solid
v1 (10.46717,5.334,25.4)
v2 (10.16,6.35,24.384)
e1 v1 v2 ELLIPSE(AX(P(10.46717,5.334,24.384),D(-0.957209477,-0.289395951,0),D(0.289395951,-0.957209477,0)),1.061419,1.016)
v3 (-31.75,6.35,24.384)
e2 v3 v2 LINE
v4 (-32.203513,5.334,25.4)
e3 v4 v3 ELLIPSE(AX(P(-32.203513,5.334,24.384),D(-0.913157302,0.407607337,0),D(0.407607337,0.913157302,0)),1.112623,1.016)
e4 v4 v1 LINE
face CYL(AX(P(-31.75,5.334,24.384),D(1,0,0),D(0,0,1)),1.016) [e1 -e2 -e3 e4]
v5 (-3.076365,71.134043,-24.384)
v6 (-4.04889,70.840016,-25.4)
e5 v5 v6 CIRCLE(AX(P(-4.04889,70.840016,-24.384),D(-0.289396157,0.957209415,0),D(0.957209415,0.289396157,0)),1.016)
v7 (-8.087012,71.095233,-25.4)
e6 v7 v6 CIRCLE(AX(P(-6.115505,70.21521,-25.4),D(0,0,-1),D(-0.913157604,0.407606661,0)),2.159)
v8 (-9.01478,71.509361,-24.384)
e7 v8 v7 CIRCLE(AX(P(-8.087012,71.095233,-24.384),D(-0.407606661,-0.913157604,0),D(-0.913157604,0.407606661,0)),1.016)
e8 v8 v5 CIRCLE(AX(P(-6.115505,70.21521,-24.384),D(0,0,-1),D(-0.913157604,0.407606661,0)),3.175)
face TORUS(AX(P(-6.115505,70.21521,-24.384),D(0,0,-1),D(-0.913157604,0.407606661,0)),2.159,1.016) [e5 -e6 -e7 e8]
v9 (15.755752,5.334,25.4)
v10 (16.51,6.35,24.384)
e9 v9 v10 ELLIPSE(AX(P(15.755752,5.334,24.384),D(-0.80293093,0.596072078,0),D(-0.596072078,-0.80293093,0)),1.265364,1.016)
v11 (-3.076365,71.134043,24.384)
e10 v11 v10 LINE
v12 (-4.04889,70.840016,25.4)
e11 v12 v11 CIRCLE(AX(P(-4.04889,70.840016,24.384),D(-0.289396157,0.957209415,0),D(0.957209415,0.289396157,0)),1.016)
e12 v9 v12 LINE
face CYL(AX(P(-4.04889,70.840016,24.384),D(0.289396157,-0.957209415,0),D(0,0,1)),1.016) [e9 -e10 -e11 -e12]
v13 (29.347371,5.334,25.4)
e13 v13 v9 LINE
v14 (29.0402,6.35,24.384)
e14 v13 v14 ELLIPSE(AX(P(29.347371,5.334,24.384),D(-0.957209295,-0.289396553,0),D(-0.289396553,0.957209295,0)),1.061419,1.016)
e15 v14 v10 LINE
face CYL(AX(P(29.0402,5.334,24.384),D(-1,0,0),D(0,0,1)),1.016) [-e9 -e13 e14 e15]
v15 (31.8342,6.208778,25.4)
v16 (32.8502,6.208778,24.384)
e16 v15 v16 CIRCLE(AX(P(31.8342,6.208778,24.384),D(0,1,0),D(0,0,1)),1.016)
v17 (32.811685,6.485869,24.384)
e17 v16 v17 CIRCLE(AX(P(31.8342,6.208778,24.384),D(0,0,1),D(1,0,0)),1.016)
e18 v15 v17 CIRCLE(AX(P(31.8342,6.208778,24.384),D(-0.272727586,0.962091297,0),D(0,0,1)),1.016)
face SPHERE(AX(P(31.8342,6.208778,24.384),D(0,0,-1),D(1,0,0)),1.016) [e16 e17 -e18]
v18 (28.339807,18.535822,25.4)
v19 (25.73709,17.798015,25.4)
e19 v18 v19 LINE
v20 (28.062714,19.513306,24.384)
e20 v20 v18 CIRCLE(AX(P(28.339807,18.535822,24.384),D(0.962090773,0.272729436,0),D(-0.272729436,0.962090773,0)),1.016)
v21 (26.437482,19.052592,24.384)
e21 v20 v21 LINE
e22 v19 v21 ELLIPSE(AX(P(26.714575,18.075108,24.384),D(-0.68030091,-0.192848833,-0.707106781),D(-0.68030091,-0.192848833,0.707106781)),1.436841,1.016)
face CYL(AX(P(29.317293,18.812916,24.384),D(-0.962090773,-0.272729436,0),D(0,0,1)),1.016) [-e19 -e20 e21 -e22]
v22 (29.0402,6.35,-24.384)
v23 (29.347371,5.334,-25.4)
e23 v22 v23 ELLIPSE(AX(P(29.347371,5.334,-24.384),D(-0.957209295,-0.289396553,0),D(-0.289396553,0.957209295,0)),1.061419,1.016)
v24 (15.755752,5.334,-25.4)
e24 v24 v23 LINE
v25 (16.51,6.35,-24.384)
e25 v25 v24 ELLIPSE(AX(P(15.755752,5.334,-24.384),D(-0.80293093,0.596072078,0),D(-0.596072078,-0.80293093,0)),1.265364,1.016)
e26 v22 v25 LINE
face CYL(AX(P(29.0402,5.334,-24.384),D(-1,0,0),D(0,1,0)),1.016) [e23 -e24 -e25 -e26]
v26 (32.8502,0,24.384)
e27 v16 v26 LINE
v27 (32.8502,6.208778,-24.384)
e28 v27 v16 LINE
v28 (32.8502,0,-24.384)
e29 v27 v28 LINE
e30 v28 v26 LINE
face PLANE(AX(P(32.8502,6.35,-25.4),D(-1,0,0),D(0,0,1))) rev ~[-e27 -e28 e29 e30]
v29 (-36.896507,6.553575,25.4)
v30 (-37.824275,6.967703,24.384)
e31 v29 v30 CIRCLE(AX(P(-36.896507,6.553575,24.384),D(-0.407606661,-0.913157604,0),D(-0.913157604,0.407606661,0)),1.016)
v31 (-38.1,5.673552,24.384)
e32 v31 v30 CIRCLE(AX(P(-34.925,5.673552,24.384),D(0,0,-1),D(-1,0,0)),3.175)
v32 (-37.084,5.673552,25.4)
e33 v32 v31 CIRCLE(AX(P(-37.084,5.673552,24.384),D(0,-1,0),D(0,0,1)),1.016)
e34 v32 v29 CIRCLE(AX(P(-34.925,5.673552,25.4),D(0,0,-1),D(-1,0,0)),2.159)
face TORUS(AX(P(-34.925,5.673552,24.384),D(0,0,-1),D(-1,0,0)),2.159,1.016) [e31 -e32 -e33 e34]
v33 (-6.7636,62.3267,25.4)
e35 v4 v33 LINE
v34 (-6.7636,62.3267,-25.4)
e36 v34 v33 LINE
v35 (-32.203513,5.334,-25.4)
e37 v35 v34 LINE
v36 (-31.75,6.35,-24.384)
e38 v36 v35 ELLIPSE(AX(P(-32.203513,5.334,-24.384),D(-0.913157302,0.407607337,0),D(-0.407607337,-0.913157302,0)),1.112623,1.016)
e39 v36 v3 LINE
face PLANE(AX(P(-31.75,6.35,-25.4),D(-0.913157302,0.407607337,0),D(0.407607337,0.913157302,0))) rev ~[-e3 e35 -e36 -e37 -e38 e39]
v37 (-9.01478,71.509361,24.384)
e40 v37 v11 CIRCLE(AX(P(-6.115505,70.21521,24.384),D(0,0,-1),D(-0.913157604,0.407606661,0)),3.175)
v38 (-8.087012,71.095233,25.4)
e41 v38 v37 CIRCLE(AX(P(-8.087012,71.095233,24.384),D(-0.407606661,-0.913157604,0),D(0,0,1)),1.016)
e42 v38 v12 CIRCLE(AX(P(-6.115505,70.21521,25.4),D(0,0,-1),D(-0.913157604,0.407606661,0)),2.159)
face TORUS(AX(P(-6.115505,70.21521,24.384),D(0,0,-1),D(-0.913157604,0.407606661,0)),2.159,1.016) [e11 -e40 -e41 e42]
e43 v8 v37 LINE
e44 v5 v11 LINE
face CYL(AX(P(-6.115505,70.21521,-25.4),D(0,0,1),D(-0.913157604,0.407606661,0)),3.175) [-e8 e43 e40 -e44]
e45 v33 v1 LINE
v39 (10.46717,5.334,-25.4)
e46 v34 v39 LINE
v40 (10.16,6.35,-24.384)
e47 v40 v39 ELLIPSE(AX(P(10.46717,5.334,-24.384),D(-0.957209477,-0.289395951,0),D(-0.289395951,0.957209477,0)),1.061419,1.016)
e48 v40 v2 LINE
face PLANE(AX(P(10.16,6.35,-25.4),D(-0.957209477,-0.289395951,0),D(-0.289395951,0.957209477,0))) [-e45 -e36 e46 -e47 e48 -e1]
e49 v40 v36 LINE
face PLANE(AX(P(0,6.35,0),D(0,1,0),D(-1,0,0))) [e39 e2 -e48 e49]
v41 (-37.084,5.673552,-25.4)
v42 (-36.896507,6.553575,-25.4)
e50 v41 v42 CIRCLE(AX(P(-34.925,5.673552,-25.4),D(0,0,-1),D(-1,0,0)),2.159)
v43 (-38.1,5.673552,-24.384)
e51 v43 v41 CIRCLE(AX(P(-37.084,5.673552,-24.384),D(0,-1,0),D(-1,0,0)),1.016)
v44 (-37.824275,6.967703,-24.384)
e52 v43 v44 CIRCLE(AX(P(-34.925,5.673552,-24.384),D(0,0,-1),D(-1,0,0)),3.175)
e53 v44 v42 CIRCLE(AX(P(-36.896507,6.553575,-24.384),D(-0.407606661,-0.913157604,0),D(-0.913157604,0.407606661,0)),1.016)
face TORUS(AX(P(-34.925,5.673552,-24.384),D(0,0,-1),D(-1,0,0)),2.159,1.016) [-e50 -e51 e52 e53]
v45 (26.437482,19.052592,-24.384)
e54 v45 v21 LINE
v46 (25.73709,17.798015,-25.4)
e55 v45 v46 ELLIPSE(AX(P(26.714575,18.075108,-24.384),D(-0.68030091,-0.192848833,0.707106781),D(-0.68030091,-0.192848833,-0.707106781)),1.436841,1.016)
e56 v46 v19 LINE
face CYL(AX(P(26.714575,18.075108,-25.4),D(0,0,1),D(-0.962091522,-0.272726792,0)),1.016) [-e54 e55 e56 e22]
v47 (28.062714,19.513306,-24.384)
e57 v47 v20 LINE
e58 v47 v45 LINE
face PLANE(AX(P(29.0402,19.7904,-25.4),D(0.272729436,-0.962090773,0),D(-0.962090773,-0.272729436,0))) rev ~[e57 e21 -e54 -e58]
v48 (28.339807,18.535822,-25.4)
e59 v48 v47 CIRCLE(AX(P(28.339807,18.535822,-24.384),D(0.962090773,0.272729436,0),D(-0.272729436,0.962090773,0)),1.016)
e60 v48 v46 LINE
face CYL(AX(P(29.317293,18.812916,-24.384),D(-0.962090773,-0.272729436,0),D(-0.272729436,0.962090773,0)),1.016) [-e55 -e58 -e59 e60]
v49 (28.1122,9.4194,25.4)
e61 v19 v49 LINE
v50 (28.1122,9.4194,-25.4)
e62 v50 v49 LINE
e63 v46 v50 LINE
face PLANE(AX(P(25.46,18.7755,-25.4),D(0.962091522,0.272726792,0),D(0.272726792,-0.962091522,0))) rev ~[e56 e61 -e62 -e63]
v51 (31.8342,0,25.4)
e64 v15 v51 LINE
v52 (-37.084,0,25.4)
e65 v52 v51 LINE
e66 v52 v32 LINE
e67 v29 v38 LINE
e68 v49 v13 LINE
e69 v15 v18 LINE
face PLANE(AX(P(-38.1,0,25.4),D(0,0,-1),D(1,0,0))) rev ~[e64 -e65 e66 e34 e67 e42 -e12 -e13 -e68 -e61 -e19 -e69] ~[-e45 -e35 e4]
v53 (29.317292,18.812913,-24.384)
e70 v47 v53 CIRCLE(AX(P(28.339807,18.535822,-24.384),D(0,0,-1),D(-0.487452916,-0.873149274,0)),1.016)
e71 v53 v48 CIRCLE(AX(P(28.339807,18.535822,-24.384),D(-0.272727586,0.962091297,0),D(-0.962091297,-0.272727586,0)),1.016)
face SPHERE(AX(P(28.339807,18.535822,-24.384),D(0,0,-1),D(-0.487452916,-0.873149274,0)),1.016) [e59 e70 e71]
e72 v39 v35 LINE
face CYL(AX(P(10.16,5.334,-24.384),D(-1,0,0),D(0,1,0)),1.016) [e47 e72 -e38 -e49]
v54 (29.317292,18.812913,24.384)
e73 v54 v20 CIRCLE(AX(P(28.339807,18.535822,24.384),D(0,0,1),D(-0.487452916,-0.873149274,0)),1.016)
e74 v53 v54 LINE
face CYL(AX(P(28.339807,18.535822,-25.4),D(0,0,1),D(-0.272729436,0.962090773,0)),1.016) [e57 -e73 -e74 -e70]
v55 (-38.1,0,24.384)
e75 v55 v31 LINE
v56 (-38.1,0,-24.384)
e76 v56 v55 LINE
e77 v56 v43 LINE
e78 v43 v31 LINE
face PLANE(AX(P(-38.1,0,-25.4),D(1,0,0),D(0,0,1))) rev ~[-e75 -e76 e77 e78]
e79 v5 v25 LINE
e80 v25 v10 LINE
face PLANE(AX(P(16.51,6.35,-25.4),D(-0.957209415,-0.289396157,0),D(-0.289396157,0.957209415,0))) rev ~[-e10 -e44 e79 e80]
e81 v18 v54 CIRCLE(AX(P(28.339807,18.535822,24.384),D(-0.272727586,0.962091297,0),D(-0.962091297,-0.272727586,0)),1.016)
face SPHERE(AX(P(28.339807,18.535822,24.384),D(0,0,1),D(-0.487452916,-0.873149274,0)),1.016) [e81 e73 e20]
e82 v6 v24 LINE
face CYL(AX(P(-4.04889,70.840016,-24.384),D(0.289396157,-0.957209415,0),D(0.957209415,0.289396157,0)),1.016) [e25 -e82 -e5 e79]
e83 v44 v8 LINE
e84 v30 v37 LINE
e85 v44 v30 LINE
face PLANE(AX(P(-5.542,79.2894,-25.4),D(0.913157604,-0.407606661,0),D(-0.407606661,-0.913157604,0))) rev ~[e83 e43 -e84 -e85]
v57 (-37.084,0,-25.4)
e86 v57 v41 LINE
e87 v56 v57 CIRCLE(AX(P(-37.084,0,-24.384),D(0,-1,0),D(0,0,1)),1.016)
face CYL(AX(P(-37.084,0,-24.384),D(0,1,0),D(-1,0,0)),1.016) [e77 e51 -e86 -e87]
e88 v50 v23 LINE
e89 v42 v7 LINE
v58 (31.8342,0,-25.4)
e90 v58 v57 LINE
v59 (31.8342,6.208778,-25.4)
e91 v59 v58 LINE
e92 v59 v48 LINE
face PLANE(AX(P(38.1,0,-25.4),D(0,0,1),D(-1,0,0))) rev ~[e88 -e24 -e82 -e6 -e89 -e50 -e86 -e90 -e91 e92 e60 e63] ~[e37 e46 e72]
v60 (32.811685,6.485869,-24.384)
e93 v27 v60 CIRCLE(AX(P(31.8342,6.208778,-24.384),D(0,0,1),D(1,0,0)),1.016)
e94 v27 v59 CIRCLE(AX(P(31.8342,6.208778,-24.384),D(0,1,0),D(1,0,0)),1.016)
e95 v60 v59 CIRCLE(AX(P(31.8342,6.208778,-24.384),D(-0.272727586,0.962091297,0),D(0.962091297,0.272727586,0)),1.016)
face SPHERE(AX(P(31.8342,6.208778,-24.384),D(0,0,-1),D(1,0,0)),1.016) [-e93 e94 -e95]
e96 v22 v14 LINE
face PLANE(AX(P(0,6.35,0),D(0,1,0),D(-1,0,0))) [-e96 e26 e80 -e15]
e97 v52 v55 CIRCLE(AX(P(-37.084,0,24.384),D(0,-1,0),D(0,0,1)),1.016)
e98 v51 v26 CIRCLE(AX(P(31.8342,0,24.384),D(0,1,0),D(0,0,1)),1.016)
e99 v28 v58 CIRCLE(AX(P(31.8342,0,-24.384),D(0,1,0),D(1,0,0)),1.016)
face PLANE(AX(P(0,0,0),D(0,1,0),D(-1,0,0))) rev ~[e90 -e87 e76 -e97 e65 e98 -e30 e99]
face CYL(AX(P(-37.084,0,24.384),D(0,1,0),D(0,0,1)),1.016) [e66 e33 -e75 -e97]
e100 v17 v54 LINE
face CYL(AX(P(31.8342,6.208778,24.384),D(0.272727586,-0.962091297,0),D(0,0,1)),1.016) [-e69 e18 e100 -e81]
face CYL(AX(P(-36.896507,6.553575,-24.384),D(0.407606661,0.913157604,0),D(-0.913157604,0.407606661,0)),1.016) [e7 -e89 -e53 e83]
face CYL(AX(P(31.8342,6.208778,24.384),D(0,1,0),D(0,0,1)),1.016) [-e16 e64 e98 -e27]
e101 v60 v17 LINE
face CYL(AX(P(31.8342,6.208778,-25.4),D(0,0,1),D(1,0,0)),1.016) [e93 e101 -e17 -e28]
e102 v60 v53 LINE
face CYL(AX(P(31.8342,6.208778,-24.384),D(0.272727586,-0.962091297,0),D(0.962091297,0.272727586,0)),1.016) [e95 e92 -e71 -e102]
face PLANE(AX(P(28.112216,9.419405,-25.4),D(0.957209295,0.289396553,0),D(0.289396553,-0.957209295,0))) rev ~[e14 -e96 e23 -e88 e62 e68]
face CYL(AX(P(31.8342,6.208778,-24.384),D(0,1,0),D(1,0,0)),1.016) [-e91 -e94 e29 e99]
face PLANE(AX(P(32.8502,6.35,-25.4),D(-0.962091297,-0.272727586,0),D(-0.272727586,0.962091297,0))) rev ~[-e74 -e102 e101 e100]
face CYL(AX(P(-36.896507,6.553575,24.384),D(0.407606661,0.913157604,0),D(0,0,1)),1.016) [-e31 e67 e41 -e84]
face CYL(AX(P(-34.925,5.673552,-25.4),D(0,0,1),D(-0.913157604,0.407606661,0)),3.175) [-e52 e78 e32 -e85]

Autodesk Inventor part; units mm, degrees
ref_plane "YZ Plane" through (0, 0, 0) normal (1, 0, 0) x (0, 1, 0)
ref_plane "XZ Plane" through (0, 0, 0) normal (0, 1, 0) x (-1, 0, 0)
ref_plane "XY Plane" through (0, 0, 0) normal (0, 0, 1) x (1, 0, 0)
sketch "Sketch1" plane through (0, 0, 0) normal (0, 1, 0) x (-1, 0, 0)
  line L0 (-38.1, -25.4) -> (38.1, -25.4)
  line L1 (38.1, -25.4) -> (38.1, 25.4)
  line L2 (38.1, 25.4) -> (-38.1, 25.4)
  line L3 (-38.1, 25.4) -> (-38.1, -25.4)
  line L4 (-38.1, -25.4) -> (38.1, 25.4) construction
  line L5 (38.1, -25.4) -> (-38.1, 25.4) construction
  point P0 (0, 0)
  dimension "d0" = 76.2
  dimension "d1" = 50.8
extrude "Extrusion1" add sketch "Sketch1" along normal blind 6.35
sketch "Sketch2" plane through (38.1, 0, -25.4) normal (0, 0, -1) x (-1, 0, 0)
  line L0 (76.2, 6.35) -> (0, 6.35) projected
  line L1 (0, 6.35) -> (21.59, 6.35)
  line L2 (21.59, 6.35) -> (43.642, 79.2894)
  line L3 (76.2, 0) -> (76.2, 6.35) projected
  line L4 (43.642, 79.2894) -> (76.2, 6.35)
  line L5 (76.2, 6.35) -> (69.85, 6.35)
  line L6 (69.85, 6.35) -> (44.8636, 62.3267)
  line L7 (21.59, 6.35) -> (27.94, 6.35) construction
  line L8 (27.94, 6.35) -> (44.8636, 62.3267)
  line L9 (0, 6.35) -> (76.2, 6.35) projected
  line L10 (10.1092, 9.821) -> (9.0598, 6.35)
  line L11 (9.0598, 6.35) -> (5.2498, 6.35)
  line L12 (5.2498, 6.35) -> (9.0598, 19.7904)
  line L13 (9.0598, 19.7904) -> (12.64, 18.7755)
  line L14 (12.64, 18.7755) -> (9.9878, 9.4194)
  point P0 (38.1, 0)
  point P1 (5.2498, 6.35)
  point P2 (9.0598, 6.35)
  dimension "d4" = 21.59
  dimension "d5" = 76.2
  dimension "d6" = 6.35
  dimension "d7" = 6.35
  dimension "d9" = 11.4808
  dimension "d10" = 3.81
  dimension "d11" = 13.97
  dimension "d23" = 73.178
extrude "Extrusion2" add sketch "Sketch2" against normal up to surface (50.8 mm away) contours L0 L6 L8 L2 L4 | L0 L12 L13 L14 L10
sketch "Sketch3" plane through (0, 6.35, 0) normal (0, 1, 0) x (1, 0, 0)
  line L0 (32.8502, -25.4) -> (38.1, -25.4) projected
  line L1 (38.1, 25.4) -> (32.8502, 25.4) projected
  line L2 (32.8502, -25.4) -> (38.1, -25.4)
  line L3 (38.1, -25.4) -> (38.1, 25.4)
  line L4 (38.1, 25.4) -> (32.8502, 25.4)
  line L5 (32.8502, 25.4) -> (32.8502, -25.4)
  point P0 (0, 0)
extrude "Extrusion3" cut sketch "Sketch3" against normal blind 6.35
fillet "Fillet1" radius 1.016 1 edges at (32.8502, 6.35, 0)
fillet "Fillet2" radius 3.175 1 edges at (-5.542, 79.2894, 0)
fillet "Fillet3" radius 3.175 1 edges at (-38.1, 6.35, 0)
fillet "Fillet4" radius 1.016 10 edges at (-5.9152, 73.3838, -25.4) (-23.4195, 39.2385, -25.4) (-38.0303, 6.3352, -25.4) (-38.1, 2.8368, -25.4) (6.7168, 38.742, -25.4) (-5.9152, 73.3838, 25.4) (6.7168, 38.742, 25.4) (-38.0303, 6.3352, 25.4) (-38.1, 2.8368, 25.4) (-23.4195, 39.2385, 25.4)
fillet "Fillet5" radius 1.016 6 edges at (-10.795, 6.35, -25.4) (15.9793, 6.35, -25.4) (22.7751, 6.35, -25.4) (-10.795, 6.35, 25.4) (15.9793, 6.35, 25.4) (22.7751, 6.35, 25.4)
fillet "Fillet6" radius 1.016 4 edges at (27.2501, 19.283, -25.4) (27.2501, 19.283, 25.4) (29.0402, 19.7904, 0) (25.46, 18.7755, 0)
fillet "Fillet7" radius 1.016 8 edges at (32.8405, 6.3487, 25.4) (31.0645, 12.6494, 25.4) (28.8351, 19.423, 25.1024) (32.8502, 3.1044, 25.4) (32.8405, 6.3487, -25.4) (31.0645, 12.6494, -25.4) (28.8351, 19.423, -25.1024) (32.8502, 3.1044, -25.4)
equation "\"d12\" = d7"
properties part number "_3DPrint"
